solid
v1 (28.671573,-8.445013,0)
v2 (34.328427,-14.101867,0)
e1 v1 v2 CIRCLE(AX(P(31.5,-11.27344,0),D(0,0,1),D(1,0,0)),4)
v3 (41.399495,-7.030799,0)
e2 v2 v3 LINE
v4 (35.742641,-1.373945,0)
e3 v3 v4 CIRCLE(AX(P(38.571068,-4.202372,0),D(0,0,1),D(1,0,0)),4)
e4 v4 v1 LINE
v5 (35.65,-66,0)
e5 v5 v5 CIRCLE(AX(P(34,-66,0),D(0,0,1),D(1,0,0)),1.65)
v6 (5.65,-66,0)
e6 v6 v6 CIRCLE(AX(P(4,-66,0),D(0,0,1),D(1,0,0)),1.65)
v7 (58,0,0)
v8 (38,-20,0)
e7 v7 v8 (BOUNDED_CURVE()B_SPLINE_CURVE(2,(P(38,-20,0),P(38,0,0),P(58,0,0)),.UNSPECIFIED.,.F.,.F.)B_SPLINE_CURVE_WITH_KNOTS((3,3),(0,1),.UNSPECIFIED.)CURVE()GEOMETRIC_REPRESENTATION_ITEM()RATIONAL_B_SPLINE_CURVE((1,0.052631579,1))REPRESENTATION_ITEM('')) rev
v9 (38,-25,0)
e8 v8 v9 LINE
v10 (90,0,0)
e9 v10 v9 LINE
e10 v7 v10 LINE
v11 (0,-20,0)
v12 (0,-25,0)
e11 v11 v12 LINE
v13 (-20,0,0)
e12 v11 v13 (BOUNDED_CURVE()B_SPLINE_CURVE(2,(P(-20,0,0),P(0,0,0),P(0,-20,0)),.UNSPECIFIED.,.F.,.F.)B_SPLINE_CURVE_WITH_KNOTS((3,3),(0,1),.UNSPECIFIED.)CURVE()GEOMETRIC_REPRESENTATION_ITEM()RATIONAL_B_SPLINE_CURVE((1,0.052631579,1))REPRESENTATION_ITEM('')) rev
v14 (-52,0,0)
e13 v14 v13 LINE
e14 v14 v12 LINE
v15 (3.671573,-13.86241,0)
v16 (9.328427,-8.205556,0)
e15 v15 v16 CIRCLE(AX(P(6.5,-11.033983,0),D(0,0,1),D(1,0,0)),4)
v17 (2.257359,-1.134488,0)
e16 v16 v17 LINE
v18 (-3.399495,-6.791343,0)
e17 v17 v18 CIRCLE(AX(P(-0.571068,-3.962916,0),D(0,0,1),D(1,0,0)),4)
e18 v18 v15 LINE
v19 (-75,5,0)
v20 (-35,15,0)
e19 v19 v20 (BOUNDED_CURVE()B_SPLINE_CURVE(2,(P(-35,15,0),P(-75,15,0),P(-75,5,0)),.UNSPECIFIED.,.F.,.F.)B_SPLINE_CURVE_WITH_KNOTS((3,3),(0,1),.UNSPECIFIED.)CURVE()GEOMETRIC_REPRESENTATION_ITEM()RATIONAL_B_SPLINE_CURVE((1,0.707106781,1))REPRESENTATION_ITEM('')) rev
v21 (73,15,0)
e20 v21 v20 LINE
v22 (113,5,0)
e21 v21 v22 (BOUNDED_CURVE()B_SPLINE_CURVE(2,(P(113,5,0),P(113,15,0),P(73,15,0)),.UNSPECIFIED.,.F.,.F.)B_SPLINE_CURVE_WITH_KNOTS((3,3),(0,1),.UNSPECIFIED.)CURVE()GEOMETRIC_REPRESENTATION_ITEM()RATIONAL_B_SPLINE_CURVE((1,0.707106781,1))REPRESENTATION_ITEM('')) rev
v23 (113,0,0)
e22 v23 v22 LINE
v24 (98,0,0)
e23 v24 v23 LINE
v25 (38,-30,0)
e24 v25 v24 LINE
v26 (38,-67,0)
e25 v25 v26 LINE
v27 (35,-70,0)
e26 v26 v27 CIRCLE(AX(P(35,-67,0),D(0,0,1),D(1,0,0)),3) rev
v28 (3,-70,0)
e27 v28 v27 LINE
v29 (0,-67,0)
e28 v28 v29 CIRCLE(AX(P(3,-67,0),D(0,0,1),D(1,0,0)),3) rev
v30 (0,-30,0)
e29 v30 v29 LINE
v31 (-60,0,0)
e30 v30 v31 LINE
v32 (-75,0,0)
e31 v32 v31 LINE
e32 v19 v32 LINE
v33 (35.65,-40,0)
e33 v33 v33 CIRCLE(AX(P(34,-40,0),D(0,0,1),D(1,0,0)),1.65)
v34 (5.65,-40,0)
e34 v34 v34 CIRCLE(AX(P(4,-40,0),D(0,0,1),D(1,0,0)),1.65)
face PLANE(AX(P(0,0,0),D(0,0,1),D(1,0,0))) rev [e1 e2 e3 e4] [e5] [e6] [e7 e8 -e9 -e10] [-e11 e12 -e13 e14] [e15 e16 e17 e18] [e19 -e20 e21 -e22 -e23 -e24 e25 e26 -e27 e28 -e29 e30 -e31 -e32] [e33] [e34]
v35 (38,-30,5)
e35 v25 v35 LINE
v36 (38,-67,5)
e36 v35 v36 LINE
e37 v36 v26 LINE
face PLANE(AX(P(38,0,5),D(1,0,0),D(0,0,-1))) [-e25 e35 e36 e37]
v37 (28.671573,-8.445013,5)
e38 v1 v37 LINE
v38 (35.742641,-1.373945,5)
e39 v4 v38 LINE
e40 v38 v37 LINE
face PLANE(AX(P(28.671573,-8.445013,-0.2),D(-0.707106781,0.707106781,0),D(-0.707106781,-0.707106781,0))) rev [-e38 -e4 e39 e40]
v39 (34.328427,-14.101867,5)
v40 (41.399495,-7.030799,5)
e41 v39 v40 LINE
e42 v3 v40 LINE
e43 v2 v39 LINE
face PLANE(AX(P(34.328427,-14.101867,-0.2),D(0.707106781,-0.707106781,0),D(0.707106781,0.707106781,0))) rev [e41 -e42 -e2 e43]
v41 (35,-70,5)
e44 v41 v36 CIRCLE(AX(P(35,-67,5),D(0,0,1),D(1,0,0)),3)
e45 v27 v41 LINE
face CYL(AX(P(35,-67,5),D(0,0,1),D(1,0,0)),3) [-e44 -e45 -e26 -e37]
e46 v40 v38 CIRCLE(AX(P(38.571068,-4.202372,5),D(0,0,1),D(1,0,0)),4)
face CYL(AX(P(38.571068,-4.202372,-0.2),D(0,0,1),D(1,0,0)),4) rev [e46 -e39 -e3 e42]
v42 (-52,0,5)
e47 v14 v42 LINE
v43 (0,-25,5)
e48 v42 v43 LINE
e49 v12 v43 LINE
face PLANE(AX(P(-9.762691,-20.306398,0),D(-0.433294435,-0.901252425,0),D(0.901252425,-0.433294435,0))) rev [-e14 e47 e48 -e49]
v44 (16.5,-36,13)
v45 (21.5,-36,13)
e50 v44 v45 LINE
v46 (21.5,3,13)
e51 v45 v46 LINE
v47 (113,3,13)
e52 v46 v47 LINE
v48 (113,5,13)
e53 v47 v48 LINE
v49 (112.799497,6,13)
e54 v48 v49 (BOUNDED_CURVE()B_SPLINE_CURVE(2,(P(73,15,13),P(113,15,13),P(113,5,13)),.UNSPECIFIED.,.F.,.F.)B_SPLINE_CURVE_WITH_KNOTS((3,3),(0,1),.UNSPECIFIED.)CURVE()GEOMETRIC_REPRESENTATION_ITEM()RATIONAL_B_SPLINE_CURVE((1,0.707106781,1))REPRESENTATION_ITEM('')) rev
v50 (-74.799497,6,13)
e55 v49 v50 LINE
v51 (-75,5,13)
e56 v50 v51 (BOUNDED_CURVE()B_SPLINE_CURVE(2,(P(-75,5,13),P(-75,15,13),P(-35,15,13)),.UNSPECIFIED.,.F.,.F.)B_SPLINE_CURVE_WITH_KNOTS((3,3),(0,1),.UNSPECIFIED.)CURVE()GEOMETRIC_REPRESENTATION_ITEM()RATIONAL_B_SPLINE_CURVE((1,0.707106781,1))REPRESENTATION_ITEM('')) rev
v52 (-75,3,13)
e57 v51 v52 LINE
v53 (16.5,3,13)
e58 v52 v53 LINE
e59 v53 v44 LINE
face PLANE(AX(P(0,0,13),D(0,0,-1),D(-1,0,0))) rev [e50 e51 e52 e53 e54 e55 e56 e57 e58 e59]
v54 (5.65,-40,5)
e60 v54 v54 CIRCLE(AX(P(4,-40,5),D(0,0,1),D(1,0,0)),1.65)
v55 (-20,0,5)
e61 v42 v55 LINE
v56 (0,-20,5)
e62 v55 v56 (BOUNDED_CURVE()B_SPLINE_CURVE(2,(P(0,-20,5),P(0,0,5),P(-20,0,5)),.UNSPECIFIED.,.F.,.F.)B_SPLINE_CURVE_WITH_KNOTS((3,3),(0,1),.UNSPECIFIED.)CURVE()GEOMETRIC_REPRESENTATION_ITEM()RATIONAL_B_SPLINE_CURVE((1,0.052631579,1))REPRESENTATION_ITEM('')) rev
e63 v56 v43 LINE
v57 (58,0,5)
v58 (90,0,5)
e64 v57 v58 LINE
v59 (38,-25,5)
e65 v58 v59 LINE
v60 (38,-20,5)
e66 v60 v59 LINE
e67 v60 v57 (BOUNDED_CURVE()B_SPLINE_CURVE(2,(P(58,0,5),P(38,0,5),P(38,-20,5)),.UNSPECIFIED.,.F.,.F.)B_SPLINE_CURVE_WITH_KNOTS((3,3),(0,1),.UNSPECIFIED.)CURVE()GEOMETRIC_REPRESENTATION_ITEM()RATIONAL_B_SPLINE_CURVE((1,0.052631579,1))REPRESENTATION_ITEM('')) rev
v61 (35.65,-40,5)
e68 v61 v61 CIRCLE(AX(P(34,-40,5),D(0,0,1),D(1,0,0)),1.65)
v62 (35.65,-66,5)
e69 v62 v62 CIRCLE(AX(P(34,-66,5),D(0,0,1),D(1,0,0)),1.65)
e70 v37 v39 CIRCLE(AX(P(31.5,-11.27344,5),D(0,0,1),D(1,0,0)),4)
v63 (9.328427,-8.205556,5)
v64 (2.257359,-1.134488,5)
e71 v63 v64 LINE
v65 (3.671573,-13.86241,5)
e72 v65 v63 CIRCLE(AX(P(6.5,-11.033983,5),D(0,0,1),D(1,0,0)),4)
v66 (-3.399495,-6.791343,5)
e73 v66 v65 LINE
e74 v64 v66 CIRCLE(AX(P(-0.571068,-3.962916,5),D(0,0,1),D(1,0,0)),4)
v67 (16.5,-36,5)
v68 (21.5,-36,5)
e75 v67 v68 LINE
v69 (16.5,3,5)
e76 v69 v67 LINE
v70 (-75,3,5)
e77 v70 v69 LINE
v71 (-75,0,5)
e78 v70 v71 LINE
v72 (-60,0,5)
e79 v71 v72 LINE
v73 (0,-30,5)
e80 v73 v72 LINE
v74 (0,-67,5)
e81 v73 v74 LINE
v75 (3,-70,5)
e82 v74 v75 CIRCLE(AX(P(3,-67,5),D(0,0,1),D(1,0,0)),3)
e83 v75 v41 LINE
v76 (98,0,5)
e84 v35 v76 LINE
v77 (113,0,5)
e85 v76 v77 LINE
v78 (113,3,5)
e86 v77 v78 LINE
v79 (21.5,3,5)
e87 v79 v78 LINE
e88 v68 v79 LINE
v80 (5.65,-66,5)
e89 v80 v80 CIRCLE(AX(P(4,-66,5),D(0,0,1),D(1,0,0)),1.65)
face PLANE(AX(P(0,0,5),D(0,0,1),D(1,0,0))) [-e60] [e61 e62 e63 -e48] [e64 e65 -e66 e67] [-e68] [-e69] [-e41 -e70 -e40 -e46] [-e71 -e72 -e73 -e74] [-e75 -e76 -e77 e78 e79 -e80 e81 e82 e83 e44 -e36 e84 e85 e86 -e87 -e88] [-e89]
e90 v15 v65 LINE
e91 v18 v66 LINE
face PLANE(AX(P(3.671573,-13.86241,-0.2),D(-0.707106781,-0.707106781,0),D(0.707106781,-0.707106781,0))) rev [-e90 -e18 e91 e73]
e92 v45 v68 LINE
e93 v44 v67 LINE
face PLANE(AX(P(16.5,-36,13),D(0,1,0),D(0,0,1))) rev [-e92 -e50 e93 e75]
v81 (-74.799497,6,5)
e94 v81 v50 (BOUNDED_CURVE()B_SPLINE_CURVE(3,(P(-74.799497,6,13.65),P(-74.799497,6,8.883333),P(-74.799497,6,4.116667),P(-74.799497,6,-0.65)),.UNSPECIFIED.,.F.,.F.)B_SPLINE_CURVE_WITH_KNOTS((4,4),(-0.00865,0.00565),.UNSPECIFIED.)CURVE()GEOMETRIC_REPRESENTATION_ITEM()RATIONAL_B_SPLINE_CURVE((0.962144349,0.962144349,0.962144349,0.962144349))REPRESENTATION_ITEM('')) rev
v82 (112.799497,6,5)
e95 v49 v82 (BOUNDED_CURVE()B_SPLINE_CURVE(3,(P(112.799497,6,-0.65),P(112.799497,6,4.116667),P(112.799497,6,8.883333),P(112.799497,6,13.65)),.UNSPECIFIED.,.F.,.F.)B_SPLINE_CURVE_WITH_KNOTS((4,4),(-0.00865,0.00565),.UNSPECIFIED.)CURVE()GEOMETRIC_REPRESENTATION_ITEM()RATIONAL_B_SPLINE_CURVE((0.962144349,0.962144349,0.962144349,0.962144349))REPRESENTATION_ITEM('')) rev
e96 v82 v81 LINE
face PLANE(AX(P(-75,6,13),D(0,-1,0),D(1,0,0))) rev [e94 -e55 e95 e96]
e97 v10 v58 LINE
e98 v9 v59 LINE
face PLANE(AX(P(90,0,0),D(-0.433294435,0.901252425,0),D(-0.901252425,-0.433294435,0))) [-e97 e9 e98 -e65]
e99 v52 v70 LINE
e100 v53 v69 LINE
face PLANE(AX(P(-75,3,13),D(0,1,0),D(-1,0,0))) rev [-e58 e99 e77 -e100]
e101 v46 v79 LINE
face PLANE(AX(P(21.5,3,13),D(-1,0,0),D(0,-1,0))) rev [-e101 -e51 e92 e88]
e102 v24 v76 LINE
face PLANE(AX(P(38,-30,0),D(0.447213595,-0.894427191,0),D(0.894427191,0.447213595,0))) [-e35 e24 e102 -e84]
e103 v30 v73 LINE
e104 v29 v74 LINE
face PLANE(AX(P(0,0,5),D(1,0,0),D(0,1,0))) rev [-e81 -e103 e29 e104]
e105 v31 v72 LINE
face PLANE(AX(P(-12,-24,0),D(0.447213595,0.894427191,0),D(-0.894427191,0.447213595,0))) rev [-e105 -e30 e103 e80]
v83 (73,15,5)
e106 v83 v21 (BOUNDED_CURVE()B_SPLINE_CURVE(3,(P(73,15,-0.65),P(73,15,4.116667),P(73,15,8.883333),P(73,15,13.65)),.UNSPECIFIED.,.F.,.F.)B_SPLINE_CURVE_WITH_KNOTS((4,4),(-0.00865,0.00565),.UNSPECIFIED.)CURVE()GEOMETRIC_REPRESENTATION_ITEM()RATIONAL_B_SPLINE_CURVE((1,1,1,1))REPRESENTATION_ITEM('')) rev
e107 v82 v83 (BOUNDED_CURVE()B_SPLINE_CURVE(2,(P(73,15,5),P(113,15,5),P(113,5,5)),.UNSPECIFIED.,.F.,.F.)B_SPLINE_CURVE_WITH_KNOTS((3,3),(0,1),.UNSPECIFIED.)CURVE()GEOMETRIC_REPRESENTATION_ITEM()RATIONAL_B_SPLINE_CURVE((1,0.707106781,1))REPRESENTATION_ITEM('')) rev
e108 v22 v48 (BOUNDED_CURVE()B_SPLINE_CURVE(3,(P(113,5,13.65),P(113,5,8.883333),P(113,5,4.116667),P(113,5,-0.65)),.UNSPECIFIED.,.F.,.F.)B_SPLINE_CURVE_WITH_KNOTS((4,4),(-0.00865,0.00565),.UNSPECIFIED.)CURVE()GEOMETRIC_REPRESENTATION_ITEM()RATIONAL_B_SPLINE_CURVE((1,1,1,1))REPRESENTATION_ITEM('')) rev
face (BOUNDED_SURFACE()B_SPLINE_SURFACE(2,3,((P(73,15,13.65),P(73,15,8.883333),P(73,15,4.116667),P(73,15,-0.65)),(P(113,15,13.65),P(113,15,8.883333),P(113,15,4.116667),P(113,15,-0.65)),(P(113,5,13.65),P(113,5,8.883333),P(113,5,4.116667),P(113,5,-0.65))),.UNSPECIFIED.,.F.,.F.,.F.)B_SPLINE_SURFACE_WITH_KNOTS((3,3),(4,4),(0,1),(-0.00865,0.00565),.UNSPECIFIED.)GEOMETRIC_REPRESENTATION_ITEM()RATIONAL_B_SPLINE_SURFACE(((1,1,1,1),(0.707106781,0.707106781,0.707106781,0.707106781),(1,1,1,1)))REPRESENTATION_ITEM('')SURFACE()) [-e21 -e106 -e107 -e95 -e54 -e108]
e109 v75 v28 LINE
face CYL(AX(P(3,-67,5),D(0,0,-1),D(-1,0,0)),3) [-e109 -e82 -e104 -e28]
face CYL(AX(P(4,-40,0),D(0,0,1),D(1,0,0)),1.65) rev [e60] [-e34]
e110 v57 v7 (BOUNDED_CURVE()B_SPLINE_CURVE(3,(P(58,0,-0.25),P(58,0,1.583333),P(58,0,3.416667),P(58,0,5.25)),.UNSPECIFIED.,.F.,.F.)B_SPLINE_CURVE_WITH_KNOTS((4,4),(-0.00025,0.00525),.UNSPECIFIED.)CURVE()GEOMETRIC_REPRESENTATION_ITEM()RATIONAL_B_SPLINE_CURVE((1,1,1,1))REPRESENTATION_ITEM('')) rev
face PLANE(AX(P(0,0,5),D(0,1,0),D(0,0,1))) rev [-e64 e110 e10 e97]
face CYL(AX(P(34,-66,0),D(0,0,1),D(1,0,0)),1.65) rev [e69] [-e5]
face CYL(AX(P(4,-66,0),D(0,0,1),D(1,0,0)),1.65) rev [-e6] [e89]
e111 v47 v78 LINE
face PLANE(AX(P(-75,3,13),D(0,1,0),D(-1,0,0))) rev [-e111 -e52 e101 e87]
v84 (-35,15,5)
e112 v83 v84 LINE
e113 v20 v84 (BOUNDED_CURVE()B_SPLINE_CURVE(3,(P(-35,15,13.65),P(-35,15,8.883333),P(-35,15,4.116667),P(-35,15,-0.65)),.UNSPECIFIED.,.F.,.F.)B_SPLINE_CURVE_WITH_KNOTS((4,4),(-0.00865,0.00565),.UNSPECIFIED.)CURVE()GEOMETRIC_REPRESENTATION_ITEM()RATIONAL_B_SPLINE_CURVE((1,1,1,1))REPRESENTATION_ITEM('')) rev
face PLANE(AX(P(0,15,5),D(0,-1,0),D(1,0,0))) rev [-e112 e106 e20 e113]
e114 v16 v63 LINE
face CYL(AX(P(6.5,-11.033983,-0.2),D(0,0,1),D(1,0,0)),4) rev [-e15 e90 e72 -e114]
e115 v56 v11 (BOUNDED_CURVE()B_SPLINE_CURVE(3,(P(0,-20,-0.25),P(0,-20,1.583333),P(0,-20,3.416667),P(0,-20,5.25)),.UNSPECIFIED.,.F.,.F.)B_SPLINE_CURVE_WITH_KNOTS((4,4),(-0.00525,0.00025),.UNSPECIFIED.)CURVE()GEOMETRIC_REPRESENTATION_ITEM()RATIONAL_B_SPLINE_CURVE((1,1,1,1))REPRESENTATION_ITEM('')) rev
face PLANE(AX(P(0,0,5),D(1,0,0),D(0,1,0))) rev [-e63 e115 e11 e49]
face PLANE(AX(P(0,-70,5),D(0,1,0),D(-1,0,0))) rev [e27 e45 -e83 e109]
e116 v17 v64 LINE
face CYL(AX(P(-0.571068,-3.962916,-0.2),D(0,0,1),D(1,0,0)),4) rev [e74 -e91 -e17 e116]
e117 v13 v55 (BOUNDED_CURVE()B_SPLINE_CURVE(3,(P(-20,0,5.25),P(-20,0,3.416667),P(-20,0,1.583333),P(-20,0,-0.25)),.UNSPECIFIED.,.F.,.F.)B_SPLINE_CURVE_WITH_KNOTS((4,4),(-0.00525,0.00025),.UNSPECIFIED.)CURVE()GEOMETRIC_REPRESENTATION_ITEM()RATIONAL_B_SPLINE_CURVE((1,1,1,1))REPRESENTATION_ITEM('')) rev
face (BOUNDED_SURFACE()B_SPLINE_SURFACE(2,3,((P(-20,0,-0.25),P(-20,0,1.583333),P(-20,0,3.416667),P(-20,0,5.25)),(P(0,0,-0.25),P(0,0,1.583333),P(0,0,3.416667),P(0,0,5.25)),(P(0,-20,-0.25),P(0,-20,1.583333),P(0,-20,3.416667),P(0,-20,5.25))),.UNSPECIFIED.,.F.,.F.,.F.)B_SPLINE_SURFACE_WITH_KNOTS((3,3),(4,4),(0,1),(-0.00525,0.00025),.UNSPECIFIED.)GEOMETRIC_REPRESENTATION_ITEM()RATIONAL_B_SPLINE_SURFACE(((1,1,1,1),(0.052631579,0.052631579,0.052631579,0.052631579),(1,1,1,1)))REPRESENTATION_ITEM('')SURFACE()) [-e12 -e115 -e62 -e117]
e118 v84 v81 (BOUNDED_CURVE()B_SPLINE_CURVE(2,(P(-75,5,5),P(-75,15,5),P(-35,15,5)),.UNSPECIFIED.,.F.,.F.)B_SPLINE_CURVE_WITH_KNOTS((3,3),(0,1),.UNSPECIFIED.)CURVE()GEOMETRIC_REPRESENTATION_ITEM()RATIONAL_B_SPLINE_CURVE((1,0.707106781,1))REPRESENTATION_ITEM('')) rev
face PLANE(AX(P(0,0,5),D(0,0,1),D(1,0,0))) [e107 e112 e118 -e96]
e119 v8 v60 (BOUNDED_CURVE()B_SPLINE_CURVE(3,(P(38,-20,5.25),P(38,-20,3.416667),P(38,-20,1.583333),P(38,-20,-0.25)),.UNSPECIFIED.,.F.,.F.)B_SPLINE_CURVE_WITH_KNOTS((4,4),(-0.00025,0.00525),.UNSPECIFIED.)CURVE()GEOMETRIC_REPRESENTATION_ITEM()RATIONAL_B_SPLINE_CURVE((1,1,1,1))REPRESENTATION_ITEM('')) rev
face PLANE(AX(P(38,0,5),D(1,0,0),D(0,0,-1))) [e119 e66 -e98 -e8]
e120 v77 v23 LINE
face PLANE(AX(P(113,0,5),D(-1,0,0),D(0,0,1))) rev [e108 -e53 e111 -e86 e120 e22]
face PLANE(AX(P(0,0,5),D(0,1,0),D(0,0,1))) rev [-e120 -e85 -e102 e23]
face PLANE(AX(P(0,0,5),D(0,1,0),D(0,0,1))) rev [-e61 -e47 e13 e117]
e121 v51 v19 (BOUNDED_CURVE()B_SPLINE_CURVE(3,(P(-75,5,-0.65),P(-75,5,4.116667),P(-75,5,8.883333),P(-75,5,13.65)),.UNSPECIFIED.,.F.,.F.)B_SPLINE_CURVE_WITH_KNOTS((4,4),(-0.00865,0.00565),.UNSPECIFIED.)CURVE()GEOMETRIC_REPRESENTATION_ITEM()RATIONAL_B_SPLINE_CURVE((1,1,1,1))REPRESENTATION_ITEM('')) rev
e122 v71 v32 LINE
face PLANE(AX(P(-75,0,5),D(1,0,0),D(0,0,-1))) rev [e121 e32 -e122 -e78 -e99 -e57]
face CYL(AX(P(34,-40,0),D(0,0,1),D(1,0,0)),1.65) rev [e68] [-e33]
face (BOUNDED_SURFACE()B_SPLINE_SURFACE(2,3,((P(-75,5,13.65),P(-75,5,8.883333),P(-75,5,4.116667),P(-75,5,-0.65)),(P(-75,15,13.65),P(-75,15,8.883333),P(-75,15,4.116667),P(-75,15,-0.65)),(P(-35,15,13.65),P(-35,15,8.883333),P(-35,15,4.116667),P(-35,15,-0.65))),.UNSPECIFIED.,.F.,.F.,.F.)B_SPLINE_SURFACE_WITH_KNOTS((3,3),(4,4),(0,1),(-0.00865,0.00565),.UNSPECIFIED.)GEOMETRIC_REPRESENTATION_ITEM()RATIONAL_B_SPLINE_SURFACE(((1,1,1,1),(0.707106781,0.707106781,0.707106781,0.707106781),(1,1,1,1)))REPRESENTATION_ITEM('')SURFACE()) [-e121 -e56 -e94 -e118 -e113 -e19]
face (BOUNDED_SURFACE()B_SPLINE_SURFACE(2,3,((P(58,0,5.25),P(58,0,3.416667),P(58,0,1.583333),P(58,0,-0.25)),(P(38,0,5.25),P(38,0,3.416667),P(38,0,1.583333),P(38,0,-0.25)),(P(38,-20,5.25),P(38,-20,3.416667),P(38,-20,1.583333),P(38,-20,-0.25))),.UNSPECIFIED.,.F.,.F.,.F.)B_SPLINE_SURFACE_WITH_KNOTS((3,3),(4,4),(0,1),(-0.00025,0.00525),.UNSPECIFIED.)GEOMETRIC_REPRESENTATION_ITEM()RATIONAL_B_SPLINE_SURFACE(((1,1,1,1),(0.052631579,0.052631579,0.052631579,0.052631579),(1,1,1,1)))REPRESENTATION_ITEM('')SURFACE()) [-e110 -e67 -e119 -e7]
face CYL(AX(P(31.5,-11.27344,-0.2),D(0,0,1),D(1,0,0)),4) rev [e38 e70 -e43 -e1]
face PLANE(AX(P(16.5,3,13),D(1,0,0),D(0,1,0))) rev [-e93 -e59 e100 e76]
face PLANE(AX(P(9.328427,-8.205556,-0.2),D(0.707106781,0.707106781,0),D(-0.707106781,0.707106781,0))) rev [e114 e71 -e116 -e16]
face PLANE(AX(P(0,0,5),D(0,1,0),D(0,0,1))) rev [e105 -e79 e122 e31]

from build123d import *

# Parameters (mm, degrees)
SKETCH1_W           = 38
SKETCH1_H           = 70
BOSS_EXTRUDE1_DEPTH = 5
SKETCH2_R           = 1.65
CUT_EXTRUDE1_DEPTH  = 134.018795664
FILLET1_R           = 3
FILLET2_DEPTH       = 5
SKETCH3_W           = 188
SKETCH3_H           = 3
BOSS_EXTRUDE2_DEPTH = 8
SKETCH4_W           = 5
SKETCH4_H           = 39
BOSS_EXTRUDE3_DEPTH = 8
BOSS_EXTRUDE4_DEPTH = 5
FILLET3_SIZE        = 40
FILLET3_SIZE_2      = 10
FILLET4_SIZE        = 40
FILLET4_SIZE_2      = 10
CUT_EXTRUDE2_DEPTH  = 134.165310942


with BuildPart() as part:
    # Sketch1 → Boss-Extrude1 (new body)
    with BuildSketch(Plane.XY):
        with Locations((19, -35)):
            Rectangle(SKETCH1_W, SKETCH1_H)
        Polygon((-75, 15), (-75, 0), (0, 0), (38, 0), (113, 0), (113, 15), align=None)
    extrude(amount=BOSS_EXTRUDE1_DEPTH)

    # Sketch2 → Cut-Extrude1 (cut, through all)
    with BuildSketch(Plane.XY.offset(5)):
        with Locations((34, -66)):
            Circle(SKETCH2_R)
        with Locations((4, -66)):
            Circle(SKETCH2_R)
        with Locations((4, -40)):
            Circle(SKETCH2_R)
        with Locations((34, -40)):
            Circle(SKETCH2_R)
    extrude(amount=-CUT_EXTRUDE1_DEPTH, mode=Mode.SUBTRACT)

    # Fillet1
    fillet1_edges = [part.edges().sort_by_distance(p)[0] for p in [
        (38, -70, 2.5),
        (0, -70, 2.5),
    ]]
    fillet(fillet1_edges, radius=FILLET1_R)

    # Fillet2: read off the stored shape, not the designer's step
    # Fillet2 outline → Fillet2 (add)
    with BuildSketch(Plane.XY):
        with BuildLine():
            add(Edge.make_bspline(
                [(58, 0), (38, 0), (38, -20)],
                knots=[0, 0, 0, 1, 1, 1], degree=2, weights=[1, 0.052631579, 1]))
            Line((58, 0), (38, 0))
            Line((38, 0), (38, -20))
        make_face()
        with BuildLine():
            Line((0, 0), (-20, 0))
            add(Edge.make_bspline(
                [(-20, 0), (0, 0), (0, -20)],
                knots=[0, 0, 0, 1, 1, 1], degree=2, weights=[1, 0.052631579, 1]))
            Line((0, -20), (0, 0))
        make_face()
    extrude(amount=FILLET2_DEPTH)

    # Sketch3 → Boss-Extrude2 (add)
    with BuildSketch(Plane.XY.offset(5)):
        with Locations((19, 4.5)):
            Rectangle(SKETCH3_W, SKETCH3_H)
    extrude(amount=BOSS_EXTRUDE2_DEPTH)

    # Sketch4 → Boss-Extrude3 (add)
    with BuildSketch(Plane.XY.offset(5)):
        with Locations((19, -16.5)):
            Rectangle(SKETCH4_W, SKETCH4_H)
    extrude(amount=BOSS_EXTRUDE3_DEPTH)

    # Sketch5 → Boss-Extrude4 (add)
    with BuildSketch(Plane.XY.offset(5)):
        Polygon((-52, 0), (-57.902965871, 0), (-60, 0), (0, -30), (0, -25), align=None)
        Polygon((38, -30), (98, 0), (90, 0), (38, -25), align=None)
    extrude(amount=-BOSS_EXTRUDE4_DEPTH)

    # Fillet3
    # a fillet whose section is not a circle: 40, 10 mm, written as the material it takes off along each edge
    with BuildSketch(Plane(origin=(-75, 15, -100), x_dir=(1, 0, 0), z_dir=(0, 0, 1))) as fillet3_piece_1:
        with BuildLine():
            Bezier((FILLET3_SIZE, 0), (0, 0), (0, -FILLET3_SIZE_2), weights=[1, 0.707106781, 1])
            Line((0, -FILLET3_SIZE_2), (0, 0))
            Line((0, 0), (FILLET3_SIZE, 0))
        make_face()
    extrude(amount=205, mode=Mode.SUBTRACT)

    # Fillet4
    # a fillet whose section is not a circle: 40, 10 mm, written as the material it takes off along each edge
    with BuildSketch(Plane(origin=(113, 15, -100), x_dir=(-1, 0, 0), z_dir=(0, 0, 1))) as fillet4_piece_1:
        with BuildLine():
            Bezier((FILLET4_SIZE, 0), (0, 0), (0, FILLET4_SIZE_2), weights=[1, 0.707106781, 1])
            Line((0, FILLET4_SIZE_2), (0, 0))
            Line((0, 0), (FILLET4_SIZE, 0))
        make_face()
    extrude(amount=205, mode=Mode.SUBTRACT)

    # Sketch6 → Cut-Extrude2 (cut, through all)
    with BuildSketch(Plane.XY.offset(5)):
        with BuildLine():
            Line((3.671572875, -13.862410437), (-3.399494937, -6.791342626))
            ThreePointArc((-3.399494937, -6.791342626), (-3.399494937, -1.134488376), (2.257359313, -1.134488376))
            Line((2.257359313, -1.134488376), (9.328427125, -8.205556188))
            ThreePointArc((9.328427125, -8.205556188), (9.328427125, -13.862410437), (3.671572875, -13.862410437))
        make_face()
        with BuildLine():
            Line((28.671572875, -8.445013015), (35.742640687, -1.373945203))
            ThreePointArc((35.742640687, -1.373945203), (41.399494937, -1.373945203), (41.399494937, -7.030799453))
            Line((41.399494937, -7.030799453), (34.328427125, -14.101867265))
            ThreePointArc((34.328427125, -14.101867265), (28.671572875, -14.101867265), (28.671572875, -8.445013015))
        make_face()
    extrude(amount=-CUT_EXTRUDE2_DEPTH, mode=Mode.SUBTRACT)


solid = part.part
